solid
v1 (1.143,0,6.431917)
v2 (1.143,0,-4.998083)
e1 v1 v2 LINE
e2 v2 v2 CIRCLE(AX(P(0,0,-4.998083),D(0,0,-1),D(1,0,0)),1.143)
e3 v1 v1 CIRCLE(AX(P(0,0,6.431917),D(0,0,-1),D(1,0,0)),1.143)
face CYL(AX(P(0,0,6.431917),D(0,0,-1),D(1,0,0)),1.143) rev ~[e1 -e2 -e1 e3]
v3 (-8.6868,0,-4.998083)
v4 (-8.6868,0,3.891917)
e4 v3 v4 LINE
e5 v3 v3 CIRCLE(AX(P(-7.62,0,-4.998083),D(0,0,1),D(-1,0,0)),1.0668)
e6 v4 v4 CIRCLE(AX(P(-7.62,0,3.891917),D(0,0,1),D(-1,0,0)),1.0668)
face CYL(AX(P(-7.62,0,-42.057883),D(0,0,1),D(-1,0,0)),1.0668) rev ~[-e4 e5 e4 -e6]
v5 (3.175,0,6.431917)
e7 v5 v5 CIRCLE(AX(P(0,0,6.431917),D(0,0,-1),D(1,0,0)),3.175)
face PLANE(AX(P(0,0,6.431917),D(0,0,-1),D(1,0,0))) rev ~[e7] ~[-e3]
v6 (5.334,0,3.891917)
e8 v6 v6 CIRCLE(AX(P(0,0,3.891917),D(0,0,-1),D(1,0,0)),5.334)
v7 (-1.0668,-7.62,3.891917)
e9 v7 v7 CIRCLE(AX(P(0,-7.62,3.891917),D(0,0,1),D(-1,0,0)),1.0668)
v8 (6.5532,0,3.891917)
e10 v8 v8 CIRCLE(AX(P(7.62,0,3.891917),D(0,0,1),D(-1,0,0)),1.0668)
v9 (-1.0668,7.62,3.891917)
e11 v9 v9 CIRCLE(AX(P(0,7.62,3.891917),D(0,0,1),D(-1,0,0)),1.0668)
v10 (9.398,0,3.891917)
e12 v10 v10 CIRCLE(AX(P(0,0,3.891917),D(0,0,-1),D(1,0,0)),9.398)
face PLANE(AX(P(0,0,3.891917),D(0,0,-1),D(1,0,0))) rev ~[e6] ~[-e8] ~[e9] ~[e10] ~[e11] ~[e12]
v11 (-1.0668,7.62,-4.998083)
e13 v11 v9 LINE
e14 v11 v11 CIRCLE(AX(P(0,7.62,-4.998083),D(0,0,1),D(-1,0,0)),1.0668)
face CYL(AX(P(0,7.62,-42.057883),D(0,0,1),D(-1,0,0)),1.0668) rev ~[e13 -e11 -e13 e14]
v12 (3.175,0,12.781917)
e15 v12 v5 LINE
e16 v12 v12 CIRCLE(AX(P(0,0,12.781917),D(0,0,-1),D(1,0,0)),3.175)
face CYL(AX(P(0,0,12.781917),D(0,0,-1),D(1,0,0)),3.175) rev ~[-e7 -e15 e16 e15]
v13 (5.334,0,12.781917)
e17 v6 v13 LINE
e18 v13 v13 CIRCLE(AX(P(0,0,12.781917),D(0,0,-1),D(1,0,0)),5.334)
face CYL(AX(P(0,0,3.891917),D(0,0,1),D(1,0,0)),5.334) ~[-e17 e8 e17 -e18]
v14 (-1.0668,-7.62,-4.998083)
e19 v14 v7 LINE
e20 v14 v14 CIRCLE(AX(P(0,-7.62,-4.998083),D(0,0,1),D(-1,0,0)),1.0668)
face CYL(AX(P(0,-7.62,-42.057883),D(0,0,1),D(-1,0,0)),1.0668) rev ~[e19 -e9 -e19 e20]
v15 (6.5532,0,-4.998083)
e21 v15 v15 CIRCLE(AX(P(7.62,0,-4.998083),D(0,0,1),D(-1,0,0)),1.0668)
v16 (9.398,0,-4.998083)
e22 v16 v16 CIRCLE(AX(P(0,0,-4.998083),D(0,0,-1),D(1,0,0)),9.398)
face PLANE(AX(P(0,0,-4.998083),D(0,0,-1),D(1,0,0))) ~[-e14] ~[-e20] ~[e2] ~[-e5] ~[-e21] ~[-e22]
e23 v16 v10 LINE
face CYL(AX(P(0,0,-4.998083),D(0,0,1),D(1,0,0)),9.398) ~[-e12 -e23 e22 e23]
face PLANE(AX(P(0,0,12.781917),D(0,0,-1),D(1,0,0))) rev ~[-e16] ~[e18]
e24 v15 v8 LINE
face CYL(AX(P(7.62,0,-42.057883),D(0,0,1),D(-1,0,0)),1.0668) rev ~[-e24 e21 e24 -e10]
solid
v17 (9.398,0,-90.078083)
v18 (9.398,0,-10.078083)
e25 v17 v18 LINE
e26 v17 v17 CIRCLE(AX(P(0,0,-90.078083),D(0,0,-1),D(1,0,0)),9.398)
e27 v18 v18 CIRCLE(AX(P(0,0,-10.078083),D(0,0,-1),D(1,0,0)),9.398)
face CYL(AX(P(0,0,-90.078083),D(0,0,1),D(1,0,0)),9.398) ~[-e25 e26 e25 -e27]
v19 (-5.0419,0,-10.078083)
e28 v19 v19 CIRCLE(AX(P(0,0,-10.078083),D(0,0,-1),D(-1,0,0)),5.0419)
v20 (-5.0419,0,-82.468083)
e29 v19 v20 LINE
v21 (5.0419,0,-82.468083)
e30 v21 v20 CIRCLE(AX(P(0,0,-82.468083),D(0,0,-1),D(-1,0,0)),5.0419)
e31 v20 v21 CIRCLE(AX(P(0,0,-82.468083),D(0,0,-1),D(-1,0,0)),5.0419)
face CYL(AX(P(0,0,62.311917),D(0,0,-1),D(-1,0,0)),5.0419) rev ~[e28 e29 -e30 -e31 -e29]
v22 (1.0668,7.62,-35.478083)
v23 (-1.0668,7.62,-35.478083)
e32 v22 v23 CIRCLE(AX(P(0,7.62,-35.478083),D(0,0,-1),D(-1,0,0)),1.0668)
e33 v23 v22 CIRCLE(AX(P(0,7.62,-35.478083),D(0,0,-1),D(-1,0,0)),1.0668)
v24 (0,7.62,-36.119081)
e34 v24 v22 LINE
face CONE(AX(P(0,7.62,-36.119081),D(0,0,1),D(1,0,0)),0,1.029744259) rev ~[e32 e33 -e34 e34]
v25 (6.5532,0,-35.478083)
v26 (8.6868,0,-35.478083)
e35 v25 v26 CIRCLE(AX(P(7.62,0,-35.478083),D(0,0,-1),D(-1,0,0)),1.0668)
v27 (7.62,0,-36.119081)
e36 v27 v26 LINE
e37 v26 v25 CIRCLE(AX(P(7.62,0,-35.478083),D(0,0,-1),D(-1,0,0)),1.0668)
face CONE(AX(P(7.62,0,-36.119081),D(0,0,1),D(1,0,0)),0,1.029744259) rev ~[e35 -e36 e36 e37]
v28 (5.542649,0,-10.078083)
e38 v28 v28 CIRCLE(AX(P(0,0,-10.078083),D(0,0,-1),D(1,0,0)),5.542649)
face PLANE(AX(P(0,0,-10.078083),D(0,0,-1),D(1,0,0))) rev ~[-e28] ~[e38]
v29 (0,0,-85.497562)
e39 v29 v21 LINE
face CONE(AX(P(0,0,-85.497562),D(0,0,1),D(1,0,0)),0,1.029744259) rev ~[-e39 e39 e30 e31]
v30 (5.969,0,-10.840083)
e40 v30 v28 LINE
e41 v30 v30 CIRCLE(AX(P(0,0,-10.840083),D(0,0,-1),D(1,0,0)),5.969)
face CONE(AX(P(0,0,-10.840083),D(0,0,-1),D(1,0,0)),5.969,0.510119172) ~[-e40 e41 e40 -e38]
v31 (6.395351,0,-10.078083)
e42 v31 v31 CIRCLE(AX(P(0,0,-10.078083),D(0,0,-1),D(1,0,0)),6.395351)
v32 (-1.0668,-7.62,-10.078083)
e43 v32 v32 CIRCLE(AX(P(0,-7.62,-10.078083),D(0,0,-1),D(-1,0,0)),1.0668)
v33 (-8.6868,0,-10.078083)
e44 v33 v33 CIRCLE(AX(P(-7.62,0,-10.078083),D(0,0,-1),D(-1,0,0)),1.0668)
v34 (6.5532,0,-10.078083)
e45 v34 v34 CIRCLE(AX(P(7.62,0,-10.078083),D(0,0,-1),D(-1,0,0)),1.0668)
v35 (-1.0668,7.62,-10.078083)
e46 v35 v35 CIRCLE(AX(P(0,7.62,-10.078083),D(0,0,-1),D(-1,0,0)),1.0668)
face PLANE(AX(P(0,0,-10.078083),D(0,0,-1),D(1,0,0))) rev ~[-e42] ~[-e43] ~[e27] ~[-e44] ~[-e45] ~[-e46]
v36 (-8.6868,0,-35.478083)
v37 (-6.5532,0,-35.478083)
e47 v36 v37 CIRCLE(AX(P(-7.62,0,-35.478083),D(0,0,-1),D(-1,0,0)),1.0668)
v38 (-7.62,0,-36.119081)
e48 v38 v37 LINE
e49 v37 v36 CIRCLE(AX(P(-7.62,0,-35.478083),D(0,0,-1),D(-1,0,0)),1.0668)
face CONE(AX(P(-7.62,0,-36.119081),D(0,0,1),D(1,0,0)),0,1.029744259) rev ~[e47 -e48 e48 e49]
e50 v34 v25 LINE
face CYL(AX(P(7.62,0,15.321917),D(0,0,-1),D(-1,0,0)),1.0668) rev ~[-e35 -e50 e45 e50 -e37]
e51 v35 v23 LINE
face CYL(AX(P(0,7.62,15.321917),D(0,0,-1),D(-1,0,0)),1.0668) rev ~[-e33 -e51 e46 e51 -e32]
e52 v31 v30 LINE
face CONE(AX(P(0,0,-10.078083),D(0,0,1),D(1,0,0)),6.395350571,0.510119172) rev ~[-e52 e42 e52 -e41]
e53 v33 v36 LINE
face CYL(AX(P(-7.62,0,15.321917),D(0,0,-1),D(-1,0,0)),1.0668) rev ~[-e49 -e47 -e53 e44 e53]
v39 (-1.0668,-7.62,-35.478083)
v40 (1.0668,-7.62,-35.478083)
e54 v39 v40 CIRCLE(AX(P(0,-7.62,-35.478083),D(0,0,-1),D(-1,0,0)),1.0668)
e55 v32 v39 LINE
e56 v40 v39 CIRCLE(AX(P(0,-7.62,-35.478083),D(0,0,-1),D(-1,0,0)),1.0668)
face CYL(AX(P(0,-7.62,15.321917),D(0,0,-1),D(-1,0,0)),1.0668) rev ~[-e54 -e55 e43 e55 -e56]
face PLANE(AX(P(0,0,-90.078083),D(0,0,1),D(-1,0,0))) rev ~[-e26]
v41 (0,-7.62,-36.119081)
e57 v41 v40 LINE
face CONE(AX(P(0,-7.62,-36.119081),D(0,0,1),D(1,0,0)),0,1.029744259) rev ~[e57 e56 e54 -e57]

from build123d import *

# Parameters (mm, degrees)
F1_W     = 5.08
F1_H     = 80
F4_D     = 2.1336
F4_DEPTH = 25.4
F4_TIP   = 0.6409981084
F5_D     = 2.1336
F6_D     = 10.0838
F6_DEPTH = 72.39
F6_TIP   = 3.0294791551


# Not quite as in the source:
# - a feature names something its author has since deleted; it is built from what else it names


with BuildPart() as f2:
    # F1 (on Front) → F2 (revolve)
    with BuildSketch(Plane.XZ):
        Polygon((9.398, -90.0780827382), (9.398, -10.0780827382), (6.3953505707, -10.0780827382), (5.969, -10.8400827382), (5.5426494293, -10.0780827382), (5.08, -10.0780827382), (5.08, -90.0780827382), align=None)
        with Locations((2.54, -50.0780827382)):
            Rectangle(F1_W, F1_H)
    revolve(axis=Axis((0, 0, -0.125199824), (0, 0, -1)))

    # F4
    with Locations(Plane.XY.offset(-10.0780827382)):
        with Locations((-7.62, 0), (0, 7.62), (7.62, 0), (0, -7.62)):
            Hole(F4_D / 2, depth=F4_DEPTH)
            with Locations((0, 0, -(F4_DEPTH + F4_TIP / 2))):  # 118° drill point
                Cone(0, F4_D / 2, F4_TIP, mode=Mode.SUBTRACT)

    # F6
    with Locations(Plane.XY.offset(-10.0780827382)):
        with Locations((0, 0)):
            Hole(F6_D / 2, depth=F6_DEPTH)
            with Locations((0, 0, -(F6_DEPTH + F6_TIP / 2))):  # 118° drill point
                Cone(0, F6_D / 2, F6_TIP, mode=Mode.SUBTRACT)


with BuildPart() as f2b:
    # F1 (on Front) → F2, piece 2 (revolve)
    with BuildSketch(Plane.XZ):
        Polygon((5.334, 3.8919172618), (5.334, 12.7819172618), (3.175, 12.7819172618), (3.175, 6.4319172618), (1.143, 6.4319172618), (1.143, -4.9980827382), (9.398, -4.9980827382), (9.398, 3.8919172618), align=None)
    revolve(axis=Axis((0, 0, -0.125199824), (0, 0, -1)))

    # F5 (through all)
    with Locations(Plane(origin=(0, 0, -10.0780827382), x_dir=(1, 0, 0), z_dir=(0, 0, -1))):
        with Locations((0, 7.62), (7.62, 0), (0, -7.62), (-7.62, 0)):
            Hole(F5_D / 2)


solid = Compound([f2.part, f2b.part])
